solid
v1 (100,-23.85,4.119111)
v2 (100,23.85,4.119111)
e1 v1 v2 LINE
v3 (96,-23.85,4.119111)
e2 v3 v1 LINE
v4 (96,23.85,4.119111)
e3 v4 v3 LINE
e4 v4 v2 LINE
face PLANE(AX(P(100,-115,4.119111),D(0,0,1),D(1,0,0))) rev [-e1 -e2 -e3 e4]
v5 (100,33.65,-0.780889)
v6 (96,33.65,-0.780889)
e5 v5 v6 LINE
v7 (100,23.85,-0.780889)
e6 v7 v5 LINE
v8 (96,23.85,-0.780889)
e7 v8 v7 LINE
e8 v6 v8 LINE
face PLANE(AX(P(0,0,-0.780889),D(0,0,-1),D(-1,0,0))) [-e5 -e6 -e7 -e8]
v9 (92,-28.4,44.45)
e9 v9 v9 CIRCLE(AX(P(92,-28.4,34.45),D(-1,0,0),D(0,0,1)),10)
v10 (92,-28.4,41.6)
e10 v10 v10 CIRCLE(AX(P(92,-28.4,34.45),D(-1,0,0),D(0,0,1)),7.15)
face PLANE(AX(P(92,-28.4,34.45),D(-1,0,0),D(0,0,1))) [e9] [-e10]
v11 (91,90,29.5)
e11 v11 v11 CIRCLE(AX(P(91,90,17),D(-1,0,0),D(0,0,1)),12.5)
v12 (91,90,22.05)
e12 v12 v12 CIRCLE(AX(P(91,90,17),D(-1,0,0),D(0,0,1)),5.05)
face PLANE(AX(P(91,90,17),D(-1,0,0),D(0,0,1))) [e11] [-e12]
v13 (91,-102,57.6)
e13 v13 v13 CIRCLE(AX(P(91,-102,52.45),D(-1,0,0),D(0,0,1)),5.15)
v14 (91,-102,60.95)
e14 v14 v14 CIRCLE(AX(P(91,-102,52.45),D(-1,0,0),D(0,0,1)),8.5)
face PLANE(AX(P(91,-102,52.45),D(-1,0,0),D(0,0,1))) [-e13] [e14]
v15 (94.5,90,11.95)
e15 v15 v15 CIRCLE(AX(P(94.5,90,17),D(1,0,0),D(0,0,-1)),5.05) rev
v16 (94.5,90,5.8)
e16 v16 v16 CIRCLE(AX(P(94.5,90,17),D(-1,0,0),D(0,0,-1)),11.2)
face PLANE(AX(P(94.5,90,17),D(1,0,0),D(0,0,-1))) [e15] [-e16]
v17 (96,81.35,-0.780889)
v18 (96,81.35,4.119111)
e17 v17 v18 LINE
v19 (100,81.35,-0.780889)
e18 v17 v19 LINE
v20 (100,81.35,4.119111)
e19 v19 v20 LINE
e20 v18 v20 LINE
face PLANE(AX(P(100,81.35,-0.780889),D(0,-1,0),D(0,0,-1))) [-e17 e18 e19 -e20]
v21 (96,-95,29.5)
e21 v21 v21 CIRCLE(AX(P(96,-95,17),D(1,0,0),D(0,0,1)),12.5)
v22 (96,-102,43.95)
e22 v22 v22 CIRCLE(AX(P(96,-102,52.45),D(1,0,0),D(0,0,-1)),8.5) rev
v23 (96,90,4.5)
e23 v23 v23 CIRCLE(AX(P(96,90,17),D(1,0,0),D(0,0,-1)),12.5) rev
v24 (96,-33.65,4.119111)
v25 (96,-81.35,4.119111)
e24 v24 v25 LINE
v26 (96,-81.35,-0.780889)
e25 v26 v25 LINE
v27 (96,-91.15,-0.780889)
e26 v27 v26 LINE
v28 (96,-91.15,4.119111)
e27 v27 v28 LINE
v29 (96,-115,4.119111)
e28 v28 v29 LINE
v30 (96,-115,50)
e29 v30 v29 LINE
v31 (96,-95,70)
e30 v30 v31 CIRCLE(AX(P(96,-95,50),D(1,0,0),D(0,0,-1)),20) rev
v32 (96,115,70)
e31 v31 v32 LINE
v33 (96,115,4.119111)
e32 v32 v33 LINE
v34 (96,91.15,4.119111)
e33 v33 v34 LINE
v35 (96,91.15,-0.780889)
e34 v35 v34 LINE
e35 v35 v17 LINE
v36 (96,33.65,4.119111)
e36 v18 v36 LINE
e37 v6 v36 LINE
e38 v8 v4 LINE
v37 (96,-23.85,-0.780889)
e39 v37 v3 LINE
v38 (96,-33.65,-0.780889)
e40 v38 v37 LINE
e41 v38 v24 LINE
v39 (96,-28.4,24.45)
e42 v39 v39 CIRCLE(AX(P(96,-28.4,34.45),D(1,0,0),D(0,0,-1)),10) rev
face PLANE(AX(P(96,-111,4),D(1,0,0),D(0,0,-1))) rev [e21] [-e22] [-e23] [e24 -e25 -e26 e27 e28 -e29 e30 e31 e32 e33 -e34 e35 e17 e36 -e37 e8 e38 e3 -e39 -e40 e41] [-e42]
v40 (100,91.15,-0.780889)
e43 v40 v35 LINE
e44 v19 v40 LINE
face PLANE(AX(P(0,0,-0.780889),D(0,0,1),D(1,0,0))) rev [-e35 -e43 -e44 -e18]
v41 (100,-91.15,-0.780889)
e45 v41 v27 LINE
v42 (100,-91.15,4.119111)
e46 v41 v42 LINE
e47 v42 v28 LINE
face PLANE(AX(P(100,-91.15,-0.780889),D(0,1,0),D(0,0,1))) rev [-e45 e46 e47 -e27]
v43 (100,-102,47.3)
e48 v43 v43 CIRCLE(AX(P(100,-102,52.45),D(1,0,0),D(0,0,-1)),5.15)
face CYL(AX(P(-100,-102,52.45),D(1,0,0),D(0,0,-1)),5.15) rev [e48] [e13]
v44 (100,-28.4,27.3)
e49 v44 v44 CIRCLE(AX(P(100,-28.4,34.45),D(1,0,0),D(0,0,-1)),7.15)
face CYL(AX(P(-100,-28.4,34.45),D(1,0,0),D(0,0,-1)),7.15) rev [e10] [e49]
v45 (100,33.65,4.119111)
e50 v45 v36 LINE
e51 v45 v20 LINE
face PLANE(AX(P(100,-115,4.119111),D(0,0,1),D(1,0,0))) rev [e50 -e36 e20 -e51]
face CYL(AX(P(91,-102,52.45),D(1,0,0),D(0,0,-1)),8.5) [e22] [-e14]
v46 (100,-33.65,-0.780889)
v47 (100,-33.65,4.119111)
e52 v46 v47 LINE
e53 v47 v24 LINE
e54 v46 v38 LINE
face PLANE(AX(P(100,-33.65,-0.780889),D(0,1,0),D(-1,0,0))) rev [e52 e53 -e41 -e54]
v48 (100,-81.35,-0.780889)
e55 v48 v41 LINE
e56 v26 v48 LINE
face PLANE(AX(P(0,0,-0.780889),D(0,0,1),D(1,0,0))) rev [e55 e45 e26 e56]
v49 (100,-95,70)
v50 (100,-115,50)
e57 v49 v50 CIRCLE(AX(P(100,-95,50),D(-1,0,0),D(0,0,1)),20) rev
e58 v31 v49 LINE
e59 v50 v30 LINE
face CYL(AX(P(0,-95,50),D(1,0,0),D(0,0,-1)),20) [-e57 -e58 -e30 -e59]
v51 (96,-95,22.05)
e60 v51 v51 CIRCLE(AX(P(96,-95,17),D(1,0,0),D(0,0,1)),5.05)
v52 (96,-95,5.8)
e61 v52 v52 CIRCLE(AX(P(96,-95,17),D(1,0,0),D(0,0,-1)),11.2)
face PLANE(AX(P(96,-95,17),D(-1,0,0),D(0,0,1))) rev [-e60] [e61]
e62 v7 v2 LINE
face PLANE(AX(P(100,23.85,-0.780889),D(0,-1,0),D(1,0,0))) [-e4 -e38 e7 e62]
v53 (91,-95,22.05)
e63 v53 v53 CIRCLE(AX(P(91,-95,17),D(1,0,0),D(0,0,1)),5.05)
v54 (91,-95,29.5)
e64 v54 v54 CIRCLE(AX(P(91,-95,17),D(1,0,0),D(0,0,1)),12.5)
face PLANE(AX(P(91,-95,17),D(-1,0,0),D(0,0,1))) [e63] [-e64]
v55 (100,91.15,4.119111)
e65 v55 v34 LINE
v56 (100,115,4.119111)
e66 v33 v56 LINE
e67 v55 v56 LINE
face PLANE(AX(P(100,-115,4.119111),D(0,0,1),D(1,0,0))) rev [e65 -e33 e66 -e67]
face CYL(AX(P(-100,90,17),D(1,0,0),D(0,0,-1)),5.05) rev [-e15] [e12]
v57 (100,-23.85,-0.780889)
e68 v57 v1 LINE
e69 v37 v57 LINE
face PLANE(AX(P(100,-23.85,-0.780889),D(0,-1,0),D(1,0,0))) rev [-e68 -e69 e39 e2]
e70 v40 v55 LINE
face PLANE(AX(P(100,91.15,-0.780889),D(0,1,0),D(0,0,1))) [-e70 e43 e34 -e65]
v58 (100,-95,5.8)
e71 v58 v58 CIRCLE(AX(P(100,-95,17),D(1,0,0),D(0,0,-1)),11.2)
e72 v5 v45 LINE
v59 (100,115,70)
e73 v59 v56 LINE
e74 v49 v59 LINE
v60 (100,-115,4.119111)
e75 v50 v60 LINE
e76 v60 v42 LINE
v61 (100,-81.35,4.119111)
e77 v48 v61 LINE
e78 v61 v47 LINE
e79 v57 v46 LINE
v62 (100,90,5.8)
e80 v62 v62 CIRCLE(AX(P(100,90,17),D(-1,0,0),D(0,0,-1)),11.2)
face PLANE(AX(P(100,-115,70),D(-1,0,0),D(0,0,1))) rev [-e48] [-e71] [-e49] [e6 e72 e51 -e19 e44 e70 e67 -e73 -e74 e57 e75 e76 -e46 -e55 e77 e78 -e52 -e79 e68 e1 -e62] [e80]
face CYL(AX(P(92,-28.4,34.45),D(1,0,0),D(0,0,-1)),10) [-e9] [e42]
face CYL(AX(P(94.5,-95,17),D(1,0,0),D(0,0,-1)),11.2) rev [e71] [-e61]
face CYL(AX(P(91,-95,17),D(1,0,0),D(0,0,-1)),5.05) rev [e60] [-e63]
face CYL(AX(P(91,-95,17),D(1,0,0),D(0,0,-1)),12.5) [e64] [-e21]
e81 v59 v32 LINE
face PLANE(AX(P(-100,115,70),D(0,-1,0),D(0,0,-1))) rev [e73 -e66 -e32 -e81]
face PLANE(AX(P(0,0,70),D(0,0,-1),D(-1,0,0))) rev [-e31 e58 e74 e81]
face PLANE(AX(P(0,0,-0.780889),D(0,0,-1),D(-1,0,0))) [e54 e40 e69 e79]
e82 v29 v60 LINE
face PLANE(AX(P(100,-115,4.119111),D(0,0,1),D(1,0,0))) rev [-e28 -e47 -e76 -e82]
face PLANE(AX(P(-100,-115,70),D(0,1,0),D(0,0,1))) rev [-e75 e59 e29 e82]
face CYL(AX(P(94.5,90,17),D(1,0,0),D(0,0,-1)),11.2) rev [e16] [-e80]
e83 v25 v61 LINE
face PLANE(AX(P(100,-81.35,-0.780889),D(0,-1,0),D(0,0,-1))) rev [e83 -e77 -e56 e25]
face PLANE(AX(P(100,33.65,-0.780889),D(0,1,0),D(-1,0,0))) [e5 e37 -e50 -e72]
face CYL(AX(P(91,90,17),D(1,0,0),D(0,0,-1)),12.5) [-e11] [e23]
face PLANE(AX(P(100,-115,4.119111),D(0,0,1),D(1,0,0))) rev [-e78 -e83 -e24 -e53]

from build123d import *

# Parameters (mm, degrees)
SKETCH1_W            = 200
SKETCH1_H            = 230
BOSS_EXTRUDE1_DEPTH  = 70
SKETCH2_W            = 192
SKETCH2_H            = 222
CUT_EXTRUDE1_DEPTH   = 66
SKETCH4_W            = 196
SKETCH4_H            = 25
CUT_EXTRUDE3_DEPTH   = 10
SKETCH10_R           = 5
CUT_EXTRUDE8_DEPTH   = 167.075284133
SKETCH11_W           = 2
SKETCH11_H           = 10
BOSS_EXTRUDE2_DEPTH  = 20
SKETCH12_W           = 2
SKETCH12_H           = 5
CUT_EXTRUDE9_DEPTH   = 20
FILLET1_R            = 2.5
SKETCH13_W           = 2
SKETCH13_H           = 10
BOSS_EXTRUDE3_DEPTH  = 20
SKETCH14_W           = 2
SKETCH14_H           = 5
CUT_EXTRUDE10_DEPTH  = 20
FILLET2_R            = 2.5
SKETCH15_W           = 192
SKETCH15_H           = 66
CUT_EXTRUDE11_DEPTH  = 267.458251889
BOSS_EXTRUDE4_DEPTH  = 2
SKETCH18_R           = 7.15
CUT_EXTRUDE12_DEPTH  = 248.638849941
SKETCH19_R           = 5.05
CUT_EXTRUDE13_DEPTH  = 248.638849941
SKETCH20_R           = 5.05
CUT_EXTRUDE14_DEPTH  = 248.638849941
BOSS_EXTRUDE5_START  = 2
BOSS_EXTRUDE5_DEPTH  = 2
SKETCH21_W           = 20
SKETCH21_H           = 10
CUT_EXTRUDE15_DEPTH  = 248.638849941
SKETCH22_W           = 92
SKETCH22_H           = 40
CUT_EXTRUDE16_DEPTH  = 10
SKETCH24_R           = 5.15
CUT_EXTRUDE18_DEPTH  = 242.091269025
FILLET3_R            = 20
FILLET4_R            = 20
SKETCH25_W           = 200
SKETCH25_H           = 4.119110625
CUT_EXTRUDE19_DEPTH  = 261.384331326
SKETCH26_W           = 4
SKETCH26_H           = 65.880889375
CUT_EXTRUDE20_DEPTH  = 261.384331326
SKETCH27_W           = 4
SKETCH27_H           = 9.8
BOSS_EXTRUDE6_DEPTH  = 4.9
SKETCH28_W           = 4
SKETCH28_H           = 9.8
BOSS_EXTRUDE7_DEPTH  = 4.9
SKETCH29_R           = 12.5
SKETCH29_R_2         = 5.05
BOSS_EXTRUDE8_DEPTH  = 5
SKETCH30_R           = 8.5
SKETCH30_R_2         = 5.15
BOSS_EXTRUDE9_DEPTH  = 5
SKETCH31_R           = 10
SKETCH31_R_2         = 7.15
BOSS_EXTRUDE10_DEPTH = 4
SKETCH32_R           = 11.2
CUT_EXTRUDE21_DEPTH  = 5.5


with BuildPart() as part:
    # Sketch1 → Boss-Extrude1 (new body)
    with BuildSketch(Plane.XY):
        Rectangle(SKETCH1_W, SKETCH1_H)
    extrude(amount=BOSS_EXTRUDE1_DEPTH)

    # Sketch2 → Cut-Extrude1 (cut)
    with BuildSketch(Plane.XY.offset(70)):
        Rectangle(SKETCH2_W, SKETCH2_H)
    extrude(amount=-CUT_EXTRUDE1_DEPTH, mode=Mode.SUBTRACT)

    # Sketch4 → Cut-Extrude3 (cut)
    with BuildSketch(Plane.XZ.offset(115)):
        with Locations((0, 57.5)):
            Rectangle(SKETCH4_W, SKETCH4_H)
    extrude(amount=-CUT_EXTRUDE3_DEPTH, mode=Mode.SUBTRACT)

    # Sketch10 → Cut-Extrude8 (cut, through all)
    with BuildSketch(Plane.XY.offset(4)):
        with Locations((0, -11)):
            Circle(SKETCH10_R)
    extrude(amount=-CUT_EXTRUDE8_DEPTH, mode=Mode.SUBTRACT)

    # Sketch11 → Boss-Extrude2 (add)
    with BuildSketch(Plane.XY.offset(70)):
        with Locations((-99, -110)):
            Rectangle(SKETCH11_W, SKETCH11_H)
    extrude(amount=BOSS_EXTRUDE2_DEPTH)

    # Sketch12 → Cut-Extrude9 (cut)
    with BuildSketch(Plane.XY.offset(90)):
        with Locations((-99, -110)):
            Rectangle(SKETCH12_W, SKETCH12_H)
    extrude(amount=-CUT_EXTRUDE9_DEPTH, mode=Mode.SUBTRACT)

    # Fillet1
    fillet1_edges = [part.edges().sort_by_distance(p)[0] for p in [
        (-99, -112.5, 70),
        (-99, -107.5, 70),
    ]]
    fillet(fillet1_edges, radius=FILLET1_R - 0.0001)  # a hair under: the kernel refuses the full size

    # Sketch13 → Boss-Extrude3 (add)
    with BuildSketch(Plane.XY.offset(70)):
        with Locations((99, -110)):
            Rectangle(SKETCH13_W, SKETCH13_H)
    extrude(amount=BOSS_EXTRUDE3_DEPTH)

    # Sketch14 → Cut-Extrude10 (cut)
    with BuildSketch(Plane.XY.offset(90)):
        with Locations((99, -110)):
            Rectangle(SKETCH14_W, SKETCH14_H)
    extrude(amount=-CUT_EXTRUDE10_DEPTH, mode=Mode.SUBTRACT)

    # Fillet2
    fillet2_edges = [part.edges().sort_by_distance(p)[0] for p in [
        (99, -112.5, 70),
        (99, -107.5, 70),
    ]]
    fillet(fillet2_edges, radius=FILLET2_R - 0.0001)  # a hair under: the kernel refuses the full size

    # Sketch15 → Cut-Extrude11 (cut, through all)
    with BuildSketch(Plane(origin=(0, 115, 0), x_dir=(1, 0, 0), z_dir=(0, 1, 0))):
        with Locations((0, -37)):
            Rectangle(SKETCH15_W, SKETCH15_H)
    extrude(amount=-CUT_EXTRUDE11_DEPTH, mode=Mode.SUBTRACT)

    # Sketch16 → Boss-Extrude4 (add)
    with BuildSketch(Plane(origin=(-98, 0, 0), x_dir=(0, 0, -1), z_dir=(1, 0, 0))):
        with BuildLine():
            Line((-90, -107.5), (-72.5, -107.5))
            ThreePointArc((-72.5, -107.5), (-70, -110), (-72.5, -112.5))
            Line((-72.5, -112.5), (-90, -112.5))
            Line((-90, -112.5), (-90, -115))
            Line((-90, -115), (-45, -115))
            Line((-45, -115), (-45, -105))
            Line((-45, -105), (-90, -105))
            Line((-90, -105), (-90, -107.5))
        make_face()
    extrude(amount=BOSS_EXTRUDE4_DEPTH)

    # Sketch18 → Cut-Extrude12 (cut, through all)
    with BuildSketch(Plane(origin=(100, 0, 0), x_dir=(0, 0, -1), z_dir=(1, 0, 0))):
        with Locations((-34.45, -28.4)):
            Circle(SKETCH18_R)
    extrude(amount=-CUT_EXTRUDE12_DEPTH, mode=Mode.SUBTRACT)

    # Sketch19 → Cut-Extrude13 (cut, through all)
    with BuildSketch(Plane(origin=(100, 0, 0), x_dir=(0, 0, -1), z_dir=(1, 0, 0))):
        with Locations((-17, -95)):
            Circle(SKETCH19_R)
    extrude(amount=-CUT_EXTRUDE13_DEPTH, mode=Mode.SUBTRACT)

    # Sketch20 → Cut-Extrude14 (cut, through all)
    with BuildSketch(Plane(origin=(100, 0, 0), x_dir=(0, 0, -1), z_dir=(1, 0, 0))):
        with Locations((-17, 90)):
            Circle(SKETCH20_R)
    extrude(amount=-CUT_EXTRUDE14_DEPTH, mode=Mode.SUBTRACT)

    # Sketch17 → Boss-Extrude5 (add)
    with BuildSketch(Plane.ZY.offset(-98).offset(BOSS_EXTRUDE5_START)):
        with BuildLine():
            Line((90, -107.5), (72.5, -107.5))
            ThreePointArc((72.5, -107.5), (70, -110), (72.5, -112.5))
            Line((72.5, -112.5), (90, -112.5))
            Line((90, -112.5), (90, -115))
            Line((90, -115), (45, -115))
            Line((45, -115), (45, -105))
            Line((45, -105), (90, -105))
            Line((90, -105), (90, -107.5))
        make_face()
    extrude(amount=-BOSS_EXTRUDE5_DEPTH)

    # Sketch21 → Cut-Extrude15 (cut, through all)
    with BuildSketch(Plane(origin=(100, 0, 0), x_dir=(0, 0, -1), z_dir=(1, 0, 0))):
        with Locations((-80, -110)):
            Rectangle(SKETCH21_W, SKETCH21_H)
    extrude(amount=-CUT_EXTRUDE15_DEPTH, mode=Mode.SUBTRACT)

    # Sketch22 → Cut-Extrude16 (cut)
    with BuildSketch(Plane.XY.offset(4)):
        with Locations((0, 95)):
            Rectangle(SKETCH22_W, SKETCH22_H)
    extrude(amount=-CUT_EXTRUDE16_DEPTH, mode=Mode.SUBTRACT)

    # Sketch24 → Cut-Extrude18 (cut, through all)
    with BuildSketch(Plane(origin=(100, 0, 0), x_dir=(0, 0, -1), z_dir=(1, 0, 0))):
        with Locations((-52.45, -102)):
            Circle(SKETCH24_R)
    extrude(amount=-CUT_EXTRUDE18_DEPTH, mode=Mode.SUBTRACT)

    # Fillet3
    fillet3_edges = [part.edges().sort_by_distance(p)[0] for p in [
        (98, -115, 70),
    ]]
    fillet(fillet3_edges, radius=FILLET3_R)

    # Fillet4
    fillet4_edges = [part.edges().sort_by_distance(p)[0] for p in [
        (-98, -115, 70),
    ]]
    fillet(fillet4_edges, radius=FILLET4_R)

    # Sketch25 → Cut-Extrude19 (cut, through all)
    with BuildSketch(Plane(origin=(0, 115, 0), x_dir=(1, 0, 0), z_dir=(0, 1, 0))):
        with Locations((0, -2.059555313)):
            Rectangle(SKETCH25_W, SKETCH25_H)
    extrude(amount=-CUT_EXTRUDE19_DEPTH, mode=Mode.SUBTRACT)


with BuildPart() as cut_extrude19_piece_1:
    # of the separate pieces the step leaves, piece 1, a body of its own (cut_extrude19_pieces)
    add(part.part.solids().sort_by_distance((100, -115, 4.119110625))[0])

    # Sketch27 → Boss-Extrude6 (add)
    with BuildSketch(Plane(origin=(0, 0, 4.119110625), x_dir=(-1, 0, 0), z_dir=(0, 0, -1))):
        with Locations((-98, -86.25)):
            Rectangle(SKETCH27_W, SKETCH27_H)
    boss_extrude6 = extrude(amount=BOSS_EXTRUDE6_DEPTH)

    # Sketch28 → Boss-Extrude7 (add)
    with BuildSketch(Plane(origin=(0, 0, 4.119110625), x_dir=(-1, 0, 0), z_dir=(0, 0, -1))):
        with Locations((-98, -28.75)):
            Rectangle(SKETCH28_W, SKETCH28_H)
    boss_extrude7 = extrude(amount=BOSS_EXTRUDE7_DEPTH)

    # Mirror1: Boss-Extrude6, Boss-Extrude7 across plane
    add(boss_extrude6.mirror(Plane.ZX))
    add(boss_extrude7.mirror(Plane.ZX))

    # Sketch29 → Boss-Extrude8 (add)
    with BuildSketch(Plane.ZY.offset(-96)):
        with Locations(Location((17, 90, 0), (0, 0, 180))):
            Circle(SKETCH29_R)
        with Locations(Location((17, 90, 0), (0, 0, 180))):
            Circle(SKETCH29_R_2, mode=Mode.SUBTRACT)
    boss_extrude8 = extrude(amount=BOSS_EXTRUDE8_DEPTH)

    # Sketch30 → Boss-Extrude9 (add)
    with BuildSketch(Plane.ZY.offset(-96)):
        with Locations(Location((52.45, -102, 0), (0, 0, 180))):
            Circle(SKETCH30_R)
        with Locations(Location((52.45, -102, 0), (0, 0, 180))):
            Circle(SKETCH30_R_2, mode=Mode.SUBTRACT)
    extrude(amount=BOSS_EXTRUDE9_DEPTH)

    # Sketch31 → Boss-Extrude10 (add)
    with BuildSketch(Plane.ZY.offset(-96)):
        with Locations(Location((34.45, -28.4, 0), (0, 0, 180))):
            Circle(SKETCH31_R)
        with Locations(Location((34.45, -28.4, 0), (0, 0, 180))):
            Circle(SKETCH31_R_2, mode=Mode.SUBTRACT)
    extrude(amount=BOSS_EXTRUDE10_DEPTH)

    # Sketch32 → Cut-Extrude21 (cut)
    with BuildSketch(Plane(origin=(100, 0, 0), x_dir=(0, 0, -1), z_dir=(1, 0, 0))):
        with Locations((-17, -95)):
            Circle(SKETCH32_R)
    cut_extrude21 = extrude(amount=-CUT_EXTRUDE21_DEPTH, mode=Mode.SUBTRACT)

    # Mirror4: Boss-Extrude8 across plane
    add(boss_extrude8.mirror(Plane.ZX.offset(-2.5)))

    # Mirror5: Cut-Extrude21 across plane
    add(cut_extrude21.mirror(Plane.ZX.offset(-2.5)), mode=Mode.SUBTRACT)


with BuildPart() as cut_extrude19_piece_2:
    # of the separate pieces the step leaves, piece 2, a body of its own (cut_extrude19_pieces)
    add(part.part.solids().sort_by_distance((-100, -115, 50))[0])

    # Sketch26 → Cut-Extrude20 (cut, through all)
    with BuildSketch(Plane(origin=(0, 115, 0), x_dir=(1, 0, 0), z_dir=(0, 1, 0))):
        with Locations((-98, -37.059555313)):
            Rectangle(SKETCH26_W, SKETCH26_H)
    extrude(amount=-CUT_EXTRUDE20_DEPTH, mode=Mode.SUBTRACT)


solid = cut_extrude19_piece_1.part
